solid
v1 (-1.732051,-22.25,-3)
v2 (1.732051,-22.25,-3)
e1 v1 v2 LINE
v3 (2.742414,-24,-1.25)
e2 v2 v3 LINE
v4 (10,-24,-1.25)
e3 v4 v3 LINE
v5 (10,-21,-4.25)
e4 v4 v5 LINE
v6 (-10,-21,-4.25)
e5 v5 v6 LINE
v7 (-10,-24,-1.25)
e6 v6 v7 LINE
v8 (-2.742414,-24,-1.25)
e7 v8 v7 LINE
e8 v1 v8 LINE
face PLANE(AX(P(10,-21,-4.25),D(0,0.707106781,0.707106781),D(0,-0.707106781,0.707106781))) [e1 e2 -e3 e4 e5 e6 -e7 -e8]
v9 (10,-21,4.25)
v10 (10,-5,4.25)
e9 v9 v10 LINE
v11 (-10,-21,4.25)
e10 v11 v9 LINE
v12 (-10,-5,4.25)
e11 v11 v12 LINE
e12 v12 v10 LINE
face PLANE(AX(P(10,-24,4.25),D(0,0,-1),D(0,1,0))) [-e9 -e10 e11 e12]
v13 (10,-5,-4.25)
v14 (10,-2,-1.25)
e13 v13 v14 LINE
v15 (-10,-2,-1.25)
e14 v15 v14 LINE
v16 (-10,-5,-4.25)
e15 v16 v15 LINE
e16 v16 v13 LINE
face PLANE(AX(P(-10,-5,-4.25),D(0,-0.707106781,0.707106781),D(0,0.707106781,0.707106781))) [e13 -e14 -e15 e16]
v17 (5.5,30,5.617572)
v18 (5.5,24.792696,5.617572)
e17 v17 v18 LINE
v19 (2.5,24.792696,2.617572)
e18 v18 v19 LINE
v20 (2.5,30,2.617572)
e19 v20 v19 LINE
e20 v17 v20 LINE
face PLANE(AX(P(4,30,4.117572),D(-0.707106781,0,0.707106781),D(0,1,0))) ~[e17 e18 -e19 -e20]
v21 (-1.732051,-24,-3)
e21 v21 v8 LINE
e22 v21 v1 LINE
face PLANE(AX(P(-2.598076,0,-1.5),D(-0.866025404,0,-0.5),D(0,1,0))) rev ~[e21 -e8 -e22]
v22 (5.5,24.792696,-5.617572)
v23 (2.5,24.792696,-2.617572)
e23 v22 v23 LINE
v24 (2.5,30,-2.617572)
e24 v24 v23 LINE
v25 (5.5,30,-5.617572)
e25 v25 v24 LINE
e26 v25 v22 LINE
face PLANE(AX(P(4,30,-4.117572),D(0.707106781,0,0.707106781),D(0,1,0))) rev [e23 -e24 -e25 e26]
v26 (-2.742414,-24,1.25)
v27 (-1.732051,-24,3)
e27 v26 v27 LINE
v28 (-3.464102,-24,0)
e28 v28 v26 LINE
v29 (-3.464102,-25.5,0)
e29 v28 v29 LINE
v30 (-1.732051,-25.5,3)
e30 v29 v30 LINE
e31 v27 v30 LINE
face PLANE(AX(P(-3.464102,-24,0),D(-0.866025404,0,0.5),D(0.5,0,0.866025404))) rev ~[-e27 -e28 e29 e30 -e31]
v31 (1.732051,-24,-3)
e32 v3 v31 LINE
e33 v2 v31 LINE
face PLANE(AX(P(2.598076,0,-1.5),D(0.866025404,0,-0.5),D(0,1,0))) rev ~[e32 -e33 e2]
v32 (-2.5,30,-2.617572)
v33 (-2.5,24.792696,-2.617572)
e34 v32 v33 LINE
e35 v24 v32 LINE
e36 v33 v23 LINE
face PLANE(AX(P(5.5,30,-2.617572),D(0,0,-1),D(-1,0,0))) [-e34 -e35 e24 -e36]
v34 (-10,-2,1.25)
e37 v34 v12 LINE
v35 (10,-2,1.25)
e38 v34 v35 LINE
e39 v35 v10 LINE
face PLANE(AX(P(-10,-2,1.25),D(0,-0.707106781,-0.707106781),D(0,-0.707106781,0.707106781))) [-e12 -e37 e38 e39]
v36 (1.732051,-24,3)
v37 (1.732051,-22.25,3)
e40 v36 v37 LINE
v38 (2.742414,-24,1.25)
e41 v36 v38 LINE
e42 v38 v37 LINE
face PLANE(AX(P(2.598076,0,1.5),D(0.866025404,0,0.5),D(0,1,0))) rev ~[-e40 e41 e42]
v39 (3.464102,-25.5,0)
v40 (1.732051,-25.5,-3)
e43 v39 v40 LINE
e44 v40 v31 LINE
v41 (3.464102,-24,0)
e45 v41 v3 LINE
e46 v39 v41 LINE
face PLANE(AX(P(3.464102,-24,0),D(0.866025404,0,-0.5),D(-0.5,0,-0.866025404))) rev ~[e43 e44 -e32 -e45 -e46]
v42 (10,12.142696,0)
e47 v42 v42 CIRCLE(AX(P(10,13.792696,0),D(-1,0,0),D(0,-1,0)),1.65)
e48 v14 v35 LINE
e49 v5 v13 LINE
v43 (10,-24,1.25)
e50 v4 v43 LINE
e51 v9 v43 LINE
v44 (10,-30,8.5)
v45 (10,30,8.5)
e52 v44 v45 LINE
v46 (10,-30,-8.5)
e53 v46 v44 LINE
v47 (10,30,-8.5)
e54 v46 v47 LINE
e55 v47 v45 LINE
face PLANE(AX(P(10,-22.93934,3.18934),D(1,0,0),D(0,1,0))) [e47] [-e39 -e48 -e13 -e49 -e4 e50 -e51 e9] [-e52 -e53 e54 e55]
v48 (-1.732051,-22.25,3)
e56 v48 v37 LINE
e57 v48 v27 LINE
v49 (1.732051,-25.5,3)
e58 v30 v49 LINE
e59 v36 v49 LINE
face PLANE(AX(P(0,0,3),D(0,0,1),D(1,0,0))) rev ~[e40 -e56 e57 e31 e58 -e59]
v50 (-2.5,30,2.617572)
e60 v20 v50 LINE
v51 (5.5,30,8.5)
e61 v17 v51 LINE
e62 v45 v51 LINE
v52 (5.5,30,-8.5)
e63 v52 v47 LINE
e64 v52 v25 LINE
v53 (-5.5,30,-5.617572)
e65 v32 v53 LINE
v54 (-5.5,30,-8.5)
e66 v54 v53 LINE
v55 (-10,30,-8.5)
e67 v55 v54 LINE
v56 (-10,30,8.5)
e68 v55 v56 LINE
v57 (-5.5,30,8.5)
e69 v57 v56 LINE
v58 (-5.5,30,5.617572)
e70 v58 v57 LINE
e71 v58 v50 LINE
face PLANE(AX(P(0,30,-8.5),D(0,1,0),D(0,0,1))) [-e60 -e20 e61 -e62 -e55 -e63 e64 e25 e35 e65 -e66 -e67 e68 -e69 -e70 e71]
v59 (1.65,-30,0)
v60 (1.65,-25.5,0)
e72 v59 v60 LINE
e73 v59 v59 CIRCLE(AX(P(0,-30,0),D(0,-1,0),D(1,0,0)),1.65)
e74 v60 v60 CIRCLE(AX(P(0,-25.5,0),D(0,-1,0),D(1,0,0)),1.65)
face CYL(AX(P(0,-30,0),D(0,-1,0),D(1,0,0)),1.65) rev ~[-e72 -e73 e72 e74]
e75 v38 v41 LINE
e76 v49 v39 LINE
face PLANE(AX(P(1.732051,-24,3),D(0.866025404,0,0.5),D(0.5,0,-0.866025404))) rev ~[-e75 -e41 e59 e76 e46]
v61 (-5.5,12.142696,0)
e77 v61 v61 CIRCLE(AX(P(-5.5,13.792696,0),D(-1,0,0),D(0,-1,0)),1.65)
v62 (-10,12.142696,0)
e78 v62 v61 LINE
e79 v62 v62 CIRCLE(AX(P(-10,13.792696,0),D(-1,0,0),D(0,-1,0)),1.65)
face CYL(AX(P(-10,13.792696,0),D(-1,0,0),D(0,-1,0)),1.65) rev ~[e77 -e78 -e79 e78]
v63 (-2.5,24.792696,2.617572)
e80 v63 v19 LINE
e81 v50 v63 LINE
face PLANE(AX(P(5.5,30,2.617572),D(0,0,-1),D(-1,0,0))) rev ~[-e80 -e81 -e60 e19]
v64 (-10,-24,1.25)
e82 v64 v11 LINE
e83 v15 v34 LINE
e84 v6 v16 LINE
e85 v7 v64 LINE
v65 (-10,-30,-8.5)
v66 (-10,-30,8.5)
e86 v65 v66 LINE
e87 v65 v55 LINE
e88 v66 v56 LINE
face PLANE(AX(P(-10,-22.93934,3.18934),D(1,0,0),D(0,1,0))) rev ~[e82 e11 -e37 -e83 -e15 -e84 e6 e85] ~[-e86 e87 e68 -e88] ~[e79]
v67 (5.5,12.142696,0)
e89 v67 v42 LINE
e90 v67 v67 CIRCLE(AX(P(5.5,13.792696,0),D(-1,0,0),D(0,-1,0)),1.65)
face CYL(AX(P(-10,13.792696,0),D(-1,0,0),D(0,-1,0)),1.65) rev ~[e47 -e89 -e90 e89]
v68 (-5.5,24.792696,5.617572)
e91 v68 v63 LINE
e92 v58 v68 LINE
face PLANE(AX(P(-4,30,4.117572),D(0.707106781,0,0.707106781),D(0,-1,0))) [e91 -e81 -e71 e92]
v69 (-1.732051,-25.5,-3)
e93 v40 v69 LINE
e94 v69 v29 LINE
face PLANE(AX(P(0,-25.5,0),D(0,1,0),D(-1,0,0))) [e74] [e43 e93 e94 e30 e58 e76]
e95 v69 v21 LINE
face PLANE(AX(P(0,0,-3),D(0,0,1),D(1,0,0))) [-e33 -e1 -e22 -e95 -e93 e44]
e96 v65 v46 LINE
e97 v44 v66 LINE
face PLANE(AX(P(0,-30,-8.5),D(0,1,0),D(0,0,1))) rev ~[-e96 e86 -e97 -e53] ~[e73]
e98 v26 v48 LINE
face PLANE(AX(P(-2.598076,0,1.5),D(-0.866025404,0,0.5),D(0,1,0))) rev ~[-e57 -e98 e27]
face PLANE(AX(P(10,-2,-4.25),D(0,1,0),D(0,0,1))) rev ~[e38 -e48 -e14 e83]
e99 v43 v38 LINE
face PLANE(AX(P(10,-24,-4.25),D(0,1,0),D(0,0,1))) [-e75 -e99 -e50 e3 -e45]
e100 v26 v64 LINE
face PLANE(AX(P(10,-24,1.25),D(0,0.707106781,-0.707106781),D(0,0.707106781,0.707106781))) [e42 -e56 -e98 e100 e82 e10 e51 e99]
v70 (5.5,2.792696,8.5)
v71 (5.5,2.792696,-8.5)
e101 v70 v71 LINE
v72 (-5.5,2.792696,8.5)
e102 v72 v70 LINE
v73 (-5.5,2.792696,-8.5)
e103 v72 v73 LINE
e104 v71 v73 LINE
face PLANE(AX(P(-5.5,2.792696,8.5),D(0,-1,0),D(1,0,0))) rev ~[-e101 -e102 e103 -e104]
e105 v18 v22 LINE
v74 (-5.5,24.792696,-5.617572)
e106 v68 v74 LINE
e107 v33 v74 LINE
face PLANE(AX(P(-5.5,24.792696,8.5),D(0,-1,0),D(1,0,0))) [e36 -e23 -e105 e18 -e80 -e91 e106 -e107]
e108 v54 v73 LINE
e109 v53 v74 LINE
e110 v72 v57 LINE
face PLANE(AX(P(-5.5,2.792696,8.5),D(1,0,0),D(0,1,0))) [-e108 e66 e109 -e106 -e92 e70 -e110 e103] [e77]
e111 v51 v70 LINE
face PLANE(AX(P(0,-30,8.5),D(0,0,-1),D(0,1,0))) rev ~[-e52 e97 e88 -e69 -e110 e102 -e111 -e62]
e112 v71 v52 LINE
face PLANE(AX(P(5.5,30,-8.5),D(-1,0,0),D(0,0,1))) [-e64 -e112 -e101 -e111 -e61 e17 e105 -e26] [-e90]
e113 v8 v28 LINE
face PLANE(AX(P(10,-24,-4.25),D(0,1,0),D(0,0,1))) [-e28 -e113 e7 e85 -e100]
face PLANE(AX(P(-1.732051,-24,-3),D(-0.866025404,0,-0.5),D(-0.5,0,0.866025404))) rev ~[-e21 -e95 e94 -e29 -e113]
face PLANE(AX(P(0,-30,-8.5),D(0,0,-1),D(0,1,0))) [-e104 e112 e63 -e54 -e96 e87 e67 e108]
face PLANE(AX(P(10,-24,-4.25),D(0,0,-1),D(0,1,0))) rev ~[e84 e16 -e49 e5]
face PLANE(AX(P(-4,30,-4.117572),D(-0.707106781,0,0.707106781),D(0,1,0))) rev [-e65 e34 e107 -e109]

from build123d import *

# Parameters (mm, degrees)
F0_W          = 60
F0_H          = 17
F1_DEPTH      = 10
F2_W          = 22
F2_H          = 8.5
F3_DEPTH      = 25
F4_W          = 11
F4_H          = 22
F5_DEPTH      = 25
F6_R          = 1.65
F7_DEPTH      = 25
F8_W          = 11
F8_H          = 5.8824277986
F9_DEPTH      = 6
F10_SIZE      = 3
F12_DEPTH     = 1.5
F13_R         = 1.65
F14_DEPTH     = 10
F15_T1_DEPTH  = 20
F15_T6_DEPTH  = 20
F15_T12_DEPTH = 20
F15_T18_DEPTH = 20
F15_T25_DEPTH = 20
F15_T31_DEPTH = 20
F15_T37_DEPTH = 20
F15_T43_DEPTH = 20
F15_T49_DEPTH = 20
F15_T56_DEPTH = 20
F15_T62_DEPTH = 20


# Not quite as in the source:
# - a fillet or chamfer that OpenCascade refuses, or shapes differently, is made with other operations: its cross-section is extruded or revolved along the edge and cut away or added


with BuildPart() as f1:
    # F0 (on Right) → F1 (new body, symmetric)
    with BuildSketch(Plane.YZ):
        Rectangle(F0_W, F0_H)
    extrude(amount=F1_DEPTH, both=True)

    # F2 (on face) → F3 (cut)
    with BuildSketch(Plane.YZ.offset(10)):
        with Locations((-13, 0)):
            Rectangle(F2_W, F2_H)
    extrude(amount=-F3_DEPTH, mode=Mode.SUBTRACT)

    # F4 (on face) → F5 (cut)
    with BuildSketch(Plane.XY.offset(8.5)):
        with Locations((0, 13.7926964089)):
            Rectangle(F4_W, F4_H)
    extrude(amount=-F5_DEPTH, mode=Mode.SUBTRACT)

    # F6 (on face) → F7 (cut)
    with BuildSketch(Plane(origin=(-10, 0, 0), x_dir=(0, -1, 0), z_dir=(-1, 0, 0))):
        with Locations((-13.7926964089, 0)):
            Circle(F6_R)
    extrude(amount=-F7_DEPTH, mode=Mode.SUBTRACT)

    # F8 (on face) → F9 (cut)
    with BuildSketch(Plane(origin=(0, 30, 0), x_dir=(-1, 0, 0), z_dir=(0, 1, 0))):
        with Locations((0, 5.5587861007)):
            Rectangle(F8_W, F8_H)
        with Locations((0, -5.5587861007)):
            Rectangle(F8_W, F8_H)
    extrude(amount=-F9_DEPTH, mode=Mode.SUBTRACT)

    # F10
    f10_edges = [f1.edges().sort_by_distance(p)[0] for p in [
        (-5.5, 27.396348, 2.617572),
        (5.5, 27.396348, 2.617572),
        (5.5, 27.396348, -2.617572),
        (-5.5, 27.396348, -2.617572),
    ]]
    chamfer(f10_edges, length=F10_SIZE)

    # F11 (on face) → F12 (cut, symmetric)
    with BuildSketch(Plane(origin=(0, -24, 0), x_dir=(-1, 0, 0), z_dir=(0, 1, 0))):
        Polygon((-1.7320508076, 3), (-3.4641016151, 0), (-1.7320508076, -3), (1.7320508076, -3), (3.4641016151, 0), (1.7320508076, 3), align=None)
    extrude(amount=F12_DEPTH, both=True, mode=Mode.SUBTRACT)

    # F13 (on face) → F14 (cut)
    with BuildSketch(Plane.XZ.offset(30)):
        Circle(F13_R)
    extrude(amount=-F14_DEPTH, mode=Mode.SUBTRACT)

    # F15: chamfer of 3 on 4 edges, made by hand

    # F15_s2 → F15_t1 (join)
    with BuildSketch(Plane.YZ.offset(-10)):
        Polygon((-2, 1.25), (-5, 4.25), (-2, 4.25), align=None)
        Polygon((-5, -4.25), (-2, -1.25), (-2, -4.25), align=None)
    extrude(amount=F15_T1_DEPTH)


with BuildPart() as f15_tool4:
    # F15_s5 → F15_t6 (new body)
    with BuildSketch(Plane.YZ.offset(10)):
        Polygon((-21, -4.25), (-24, -1.25), (-24, -4.25), align=None)
    extrude(amount=-F15_T6_DEPTH)

    split(bisect_by=Plane.XY.offset(-3), keep=Keep.BOTTOM)

    split(bisect_by=Plane(origin=(2.5980762114, 0, -1.5), x_dir=(0, 1, 0), z_dir=(0.8660254038, 0, -0.5)), keep=Keep.TOP)


with BuildPart() as f1_1:
    add(f1.part)

    # F15_t3: union F15_tool4
    add(f15_tool4.part)


with BuildPart() as f15_tool10:
    # F15_s11 → F15_t12 (new body)
    with BuildSketch(Plane.YZ.offset(10)):
        Polygon((-21, -4.25), (-24, -1.25), (-24, -4.25), align=None)
    extrude(amount=-F15_T12_DEPTH)

    split(bisect_by=Plane.XY.offset(-3), keep=Keep.TOP)

    split(bisect_by=Plane(origin=(2.5980762114, 0, -1.5), x_dir=(0, 1, 0), z_dir=(0.8660254038, 0, -0.5)), keep=Keep.TOP)


with BuildPart() as f1_2:
    add(f1_1.part)

    # F15_t9: union F15_tool10
    add(f15_tool10.part)


with BuildPart() as f15_tool16:
    # F15_s17 → F15_t18 (new body)
    with BuildSketch(Plane.YZ.offset(10)):
        Polygon((-21, -4.25), (-24, -1.25), (-24, -4.25), align=None)
    extrude(amount=-F15_T18_DEPTH)

    split(bisect_by=Plane(origin=(-2.5980762114, 0, -1.5), x_dir=(0, 1, 0), z_dir=(0.8660254038, 0, 0.5)), keep=Keep.TOP)

    split(bisect_by=Plane.XY.offset(-3), keep=Keep.BOTTOM)

    split(bisect_by=Plane(origin=(2.5980762114, 0, -1.5), x_dir=(0, 1, 0), z_dir=(-0.8660254038, 0, 0.5)), keep=Keep.TOP)


with BuildPart() as f1_3:
    add(f1_2.part)

    # F15_t15: union F15_tool16
    add(f15_tool16.part)


with BuildPart() as f15_tool23:
    # F15_s24 → F15_t25 (new body)
    with BuildSketch(Plane.YZ.offset(10)):
        Polygon((-21, -4.25), (-24, -1.25), (-24, -4.25), align=None)
    extrude(amount=-F15_T25_DEPTH)

    split(bisect_by=Plane(origin=(-2.5980762114, 0, -1.5), x_dir=(0, 1, 0), z_dir=(-0.8660254038, 0, -0.5)), keep=Keep.TOP)

    split(bisect_by=Plane.XY.offset(-3), keep=Keep.BOTTOM)


with BuildPart() as f1_4:
    add(f1_3.part)

    # F15_t22: union F15_tool23
    add(f15_tool23.part)


with BuildPart() as f15_tool29:
    # F15_s30 → F15_t31 (new body)
    with BuildSketch(Plane.YZ.offset(10)):
        Polygon((-21, -4.25), (-24, -1.25), (-24, -4.25), align=None)
    extrude(amount=-F15_T31_DEPTH)

    split(bisect_by=Plane(origin=(-2.5980762114, 0, -1.5), x_dir=(0, 1, 0), z_dir=(-0.8660254038, 0, -0.5)), keep=Keep.TOP)

    split(bisect_by=Plane.XY.offset(-3), keep=Keep.TOP)


with BuildPart() as f1_5:
    add(f1_4.part)

    # F15_t28: union F15_tool29
    add(f15_tool29.part)


with BuildPart() as f15_tool35:
    # F15_s36 → F15_t37 (new body)
    with BuildSketch(Plane.YZ.offset(10)):
        Polygon((-24, 1.25), (-21, 4.25), (-24, 4.25), align=None)
    extrude(amount=-F15_T37_DEPTH)

    split(bisect_by=Plane(origin=(2.5980762114, 0, 1.5), x_dir=(0, 1, 0), z_dir=(0.8660254038, 0, 0.5)), keep=Keep.TOP)

    split(bisect_by=Plane.XY.offset(3), keep=Keep.BOTTOM)


with BuildPart() as f1_6:
    add(f1_5.part)

    # F15_t34: union F15_tool35
    add(f15_tool35.part)


with BuildPart() as f15_tool41:
    # F15_s42 → F15_t43 (new body)
    with BuildSketch(Plane.YZ.offset(10)):
        Polygon((-24, 1.25), (-21, 4.25), (-24, 4.25), align=None)
    extrude(amount=-F15_T43_DEPTH)

    split(bisect_by=Plane(origin=(2.5980762114, 0, 1.5), x_dir=(0, 1, 0), z_dir=(0.8660254038, 0, 0.5)), keep=Keep.TOP)

    split(bisect_by=Plane.XY.offset(3), keep=Keep.TOP)


with BuildPart() as f1_7:
    add(f1_6.part)

    # F15_t40: union F15_tool41
    add(f15_tool41.part)


with BuildPart() as f15_tool47:
    # F15_s48 → F15_t49 (new body)
    with BuildSketch(Plane.YZ.offset(10)):
        Polygon((-24, 1.25), (-21, 4.25), (-24, 4.25), align=None)
    extrude(amount=-F15_T49_DEPTH)

    split(bisect_by=Plane(origin=(-2.5980762114, 0, 1.5), x_dir=(0, 1, 0), z_dir=(0.8660254038, 0, -0.5)), keep=Keep.TOP)

    split(bisect_by=Plane(origin=(2.5980762114, 0, 1.5), x_dir=(0, 1, 0), z_dir=(-0.8660254038, 0, -0.5)), keep=Keep.TOP)

    split(bisect_by=Plane.XY.offset(3), keep=Keep.TOP)


with BuildPart() as f1_8:
    add(f1_7.part)

    # F15_t46: union F15_tool47
    add(f15_tool47.part)


with BuildPart() as f15_tool54:
    # F15_s55 → F15_t56 (new body)
    with BuildSketch(Plane.YZ.offset(10)):
        Polygon((-24, 1.25), (-21, 4.25), (-24, 4.25), align=None)
    extrude(amount=-F15_T56_DEPTH)

    split(bisect_by=Plane(origin=(-2.5980762114, 0, 1.5), x_dir=(0, 1, 0), z_dir=(-0.8660254038, 0, 0.5)), keep=Keep.TOP)

    split(bisect_by=Plane.XY.offset(3), keep=Keep.BOTTOM)


with BuildPart() as f1_9:
    add(f1_8.part)

    # F15_t53: union F15_tool54
    add(f15_tool54.part)


with BuildPart() as f15_tool60:
    # F15_s61 → F15_t62 (new body)
    with BuildSketch(Plane.YZ.offset(10)):
        Polygon((-24, 1.25), (-21, 4.25), (-24, 4.25), align=None)
    extrude(amount=-F15_T62_DEPTH)

    split(bisect_by=Plane(origin=(-2.5980762114, 0, 1.5), x_dir=(0, 1, 0), z_dir=(-0.8660254038, 0, 0.5)), keep=Keep.TOP)

    split(bisect_by=Plane.XY.offset(3), keep=Keep.TOP)


with BuildPart() as f1_10:
    add(f1_9.part)

    # F15_t59: union F15_tool60
    add(f15_tool60.part)


solid = f1_10.part
